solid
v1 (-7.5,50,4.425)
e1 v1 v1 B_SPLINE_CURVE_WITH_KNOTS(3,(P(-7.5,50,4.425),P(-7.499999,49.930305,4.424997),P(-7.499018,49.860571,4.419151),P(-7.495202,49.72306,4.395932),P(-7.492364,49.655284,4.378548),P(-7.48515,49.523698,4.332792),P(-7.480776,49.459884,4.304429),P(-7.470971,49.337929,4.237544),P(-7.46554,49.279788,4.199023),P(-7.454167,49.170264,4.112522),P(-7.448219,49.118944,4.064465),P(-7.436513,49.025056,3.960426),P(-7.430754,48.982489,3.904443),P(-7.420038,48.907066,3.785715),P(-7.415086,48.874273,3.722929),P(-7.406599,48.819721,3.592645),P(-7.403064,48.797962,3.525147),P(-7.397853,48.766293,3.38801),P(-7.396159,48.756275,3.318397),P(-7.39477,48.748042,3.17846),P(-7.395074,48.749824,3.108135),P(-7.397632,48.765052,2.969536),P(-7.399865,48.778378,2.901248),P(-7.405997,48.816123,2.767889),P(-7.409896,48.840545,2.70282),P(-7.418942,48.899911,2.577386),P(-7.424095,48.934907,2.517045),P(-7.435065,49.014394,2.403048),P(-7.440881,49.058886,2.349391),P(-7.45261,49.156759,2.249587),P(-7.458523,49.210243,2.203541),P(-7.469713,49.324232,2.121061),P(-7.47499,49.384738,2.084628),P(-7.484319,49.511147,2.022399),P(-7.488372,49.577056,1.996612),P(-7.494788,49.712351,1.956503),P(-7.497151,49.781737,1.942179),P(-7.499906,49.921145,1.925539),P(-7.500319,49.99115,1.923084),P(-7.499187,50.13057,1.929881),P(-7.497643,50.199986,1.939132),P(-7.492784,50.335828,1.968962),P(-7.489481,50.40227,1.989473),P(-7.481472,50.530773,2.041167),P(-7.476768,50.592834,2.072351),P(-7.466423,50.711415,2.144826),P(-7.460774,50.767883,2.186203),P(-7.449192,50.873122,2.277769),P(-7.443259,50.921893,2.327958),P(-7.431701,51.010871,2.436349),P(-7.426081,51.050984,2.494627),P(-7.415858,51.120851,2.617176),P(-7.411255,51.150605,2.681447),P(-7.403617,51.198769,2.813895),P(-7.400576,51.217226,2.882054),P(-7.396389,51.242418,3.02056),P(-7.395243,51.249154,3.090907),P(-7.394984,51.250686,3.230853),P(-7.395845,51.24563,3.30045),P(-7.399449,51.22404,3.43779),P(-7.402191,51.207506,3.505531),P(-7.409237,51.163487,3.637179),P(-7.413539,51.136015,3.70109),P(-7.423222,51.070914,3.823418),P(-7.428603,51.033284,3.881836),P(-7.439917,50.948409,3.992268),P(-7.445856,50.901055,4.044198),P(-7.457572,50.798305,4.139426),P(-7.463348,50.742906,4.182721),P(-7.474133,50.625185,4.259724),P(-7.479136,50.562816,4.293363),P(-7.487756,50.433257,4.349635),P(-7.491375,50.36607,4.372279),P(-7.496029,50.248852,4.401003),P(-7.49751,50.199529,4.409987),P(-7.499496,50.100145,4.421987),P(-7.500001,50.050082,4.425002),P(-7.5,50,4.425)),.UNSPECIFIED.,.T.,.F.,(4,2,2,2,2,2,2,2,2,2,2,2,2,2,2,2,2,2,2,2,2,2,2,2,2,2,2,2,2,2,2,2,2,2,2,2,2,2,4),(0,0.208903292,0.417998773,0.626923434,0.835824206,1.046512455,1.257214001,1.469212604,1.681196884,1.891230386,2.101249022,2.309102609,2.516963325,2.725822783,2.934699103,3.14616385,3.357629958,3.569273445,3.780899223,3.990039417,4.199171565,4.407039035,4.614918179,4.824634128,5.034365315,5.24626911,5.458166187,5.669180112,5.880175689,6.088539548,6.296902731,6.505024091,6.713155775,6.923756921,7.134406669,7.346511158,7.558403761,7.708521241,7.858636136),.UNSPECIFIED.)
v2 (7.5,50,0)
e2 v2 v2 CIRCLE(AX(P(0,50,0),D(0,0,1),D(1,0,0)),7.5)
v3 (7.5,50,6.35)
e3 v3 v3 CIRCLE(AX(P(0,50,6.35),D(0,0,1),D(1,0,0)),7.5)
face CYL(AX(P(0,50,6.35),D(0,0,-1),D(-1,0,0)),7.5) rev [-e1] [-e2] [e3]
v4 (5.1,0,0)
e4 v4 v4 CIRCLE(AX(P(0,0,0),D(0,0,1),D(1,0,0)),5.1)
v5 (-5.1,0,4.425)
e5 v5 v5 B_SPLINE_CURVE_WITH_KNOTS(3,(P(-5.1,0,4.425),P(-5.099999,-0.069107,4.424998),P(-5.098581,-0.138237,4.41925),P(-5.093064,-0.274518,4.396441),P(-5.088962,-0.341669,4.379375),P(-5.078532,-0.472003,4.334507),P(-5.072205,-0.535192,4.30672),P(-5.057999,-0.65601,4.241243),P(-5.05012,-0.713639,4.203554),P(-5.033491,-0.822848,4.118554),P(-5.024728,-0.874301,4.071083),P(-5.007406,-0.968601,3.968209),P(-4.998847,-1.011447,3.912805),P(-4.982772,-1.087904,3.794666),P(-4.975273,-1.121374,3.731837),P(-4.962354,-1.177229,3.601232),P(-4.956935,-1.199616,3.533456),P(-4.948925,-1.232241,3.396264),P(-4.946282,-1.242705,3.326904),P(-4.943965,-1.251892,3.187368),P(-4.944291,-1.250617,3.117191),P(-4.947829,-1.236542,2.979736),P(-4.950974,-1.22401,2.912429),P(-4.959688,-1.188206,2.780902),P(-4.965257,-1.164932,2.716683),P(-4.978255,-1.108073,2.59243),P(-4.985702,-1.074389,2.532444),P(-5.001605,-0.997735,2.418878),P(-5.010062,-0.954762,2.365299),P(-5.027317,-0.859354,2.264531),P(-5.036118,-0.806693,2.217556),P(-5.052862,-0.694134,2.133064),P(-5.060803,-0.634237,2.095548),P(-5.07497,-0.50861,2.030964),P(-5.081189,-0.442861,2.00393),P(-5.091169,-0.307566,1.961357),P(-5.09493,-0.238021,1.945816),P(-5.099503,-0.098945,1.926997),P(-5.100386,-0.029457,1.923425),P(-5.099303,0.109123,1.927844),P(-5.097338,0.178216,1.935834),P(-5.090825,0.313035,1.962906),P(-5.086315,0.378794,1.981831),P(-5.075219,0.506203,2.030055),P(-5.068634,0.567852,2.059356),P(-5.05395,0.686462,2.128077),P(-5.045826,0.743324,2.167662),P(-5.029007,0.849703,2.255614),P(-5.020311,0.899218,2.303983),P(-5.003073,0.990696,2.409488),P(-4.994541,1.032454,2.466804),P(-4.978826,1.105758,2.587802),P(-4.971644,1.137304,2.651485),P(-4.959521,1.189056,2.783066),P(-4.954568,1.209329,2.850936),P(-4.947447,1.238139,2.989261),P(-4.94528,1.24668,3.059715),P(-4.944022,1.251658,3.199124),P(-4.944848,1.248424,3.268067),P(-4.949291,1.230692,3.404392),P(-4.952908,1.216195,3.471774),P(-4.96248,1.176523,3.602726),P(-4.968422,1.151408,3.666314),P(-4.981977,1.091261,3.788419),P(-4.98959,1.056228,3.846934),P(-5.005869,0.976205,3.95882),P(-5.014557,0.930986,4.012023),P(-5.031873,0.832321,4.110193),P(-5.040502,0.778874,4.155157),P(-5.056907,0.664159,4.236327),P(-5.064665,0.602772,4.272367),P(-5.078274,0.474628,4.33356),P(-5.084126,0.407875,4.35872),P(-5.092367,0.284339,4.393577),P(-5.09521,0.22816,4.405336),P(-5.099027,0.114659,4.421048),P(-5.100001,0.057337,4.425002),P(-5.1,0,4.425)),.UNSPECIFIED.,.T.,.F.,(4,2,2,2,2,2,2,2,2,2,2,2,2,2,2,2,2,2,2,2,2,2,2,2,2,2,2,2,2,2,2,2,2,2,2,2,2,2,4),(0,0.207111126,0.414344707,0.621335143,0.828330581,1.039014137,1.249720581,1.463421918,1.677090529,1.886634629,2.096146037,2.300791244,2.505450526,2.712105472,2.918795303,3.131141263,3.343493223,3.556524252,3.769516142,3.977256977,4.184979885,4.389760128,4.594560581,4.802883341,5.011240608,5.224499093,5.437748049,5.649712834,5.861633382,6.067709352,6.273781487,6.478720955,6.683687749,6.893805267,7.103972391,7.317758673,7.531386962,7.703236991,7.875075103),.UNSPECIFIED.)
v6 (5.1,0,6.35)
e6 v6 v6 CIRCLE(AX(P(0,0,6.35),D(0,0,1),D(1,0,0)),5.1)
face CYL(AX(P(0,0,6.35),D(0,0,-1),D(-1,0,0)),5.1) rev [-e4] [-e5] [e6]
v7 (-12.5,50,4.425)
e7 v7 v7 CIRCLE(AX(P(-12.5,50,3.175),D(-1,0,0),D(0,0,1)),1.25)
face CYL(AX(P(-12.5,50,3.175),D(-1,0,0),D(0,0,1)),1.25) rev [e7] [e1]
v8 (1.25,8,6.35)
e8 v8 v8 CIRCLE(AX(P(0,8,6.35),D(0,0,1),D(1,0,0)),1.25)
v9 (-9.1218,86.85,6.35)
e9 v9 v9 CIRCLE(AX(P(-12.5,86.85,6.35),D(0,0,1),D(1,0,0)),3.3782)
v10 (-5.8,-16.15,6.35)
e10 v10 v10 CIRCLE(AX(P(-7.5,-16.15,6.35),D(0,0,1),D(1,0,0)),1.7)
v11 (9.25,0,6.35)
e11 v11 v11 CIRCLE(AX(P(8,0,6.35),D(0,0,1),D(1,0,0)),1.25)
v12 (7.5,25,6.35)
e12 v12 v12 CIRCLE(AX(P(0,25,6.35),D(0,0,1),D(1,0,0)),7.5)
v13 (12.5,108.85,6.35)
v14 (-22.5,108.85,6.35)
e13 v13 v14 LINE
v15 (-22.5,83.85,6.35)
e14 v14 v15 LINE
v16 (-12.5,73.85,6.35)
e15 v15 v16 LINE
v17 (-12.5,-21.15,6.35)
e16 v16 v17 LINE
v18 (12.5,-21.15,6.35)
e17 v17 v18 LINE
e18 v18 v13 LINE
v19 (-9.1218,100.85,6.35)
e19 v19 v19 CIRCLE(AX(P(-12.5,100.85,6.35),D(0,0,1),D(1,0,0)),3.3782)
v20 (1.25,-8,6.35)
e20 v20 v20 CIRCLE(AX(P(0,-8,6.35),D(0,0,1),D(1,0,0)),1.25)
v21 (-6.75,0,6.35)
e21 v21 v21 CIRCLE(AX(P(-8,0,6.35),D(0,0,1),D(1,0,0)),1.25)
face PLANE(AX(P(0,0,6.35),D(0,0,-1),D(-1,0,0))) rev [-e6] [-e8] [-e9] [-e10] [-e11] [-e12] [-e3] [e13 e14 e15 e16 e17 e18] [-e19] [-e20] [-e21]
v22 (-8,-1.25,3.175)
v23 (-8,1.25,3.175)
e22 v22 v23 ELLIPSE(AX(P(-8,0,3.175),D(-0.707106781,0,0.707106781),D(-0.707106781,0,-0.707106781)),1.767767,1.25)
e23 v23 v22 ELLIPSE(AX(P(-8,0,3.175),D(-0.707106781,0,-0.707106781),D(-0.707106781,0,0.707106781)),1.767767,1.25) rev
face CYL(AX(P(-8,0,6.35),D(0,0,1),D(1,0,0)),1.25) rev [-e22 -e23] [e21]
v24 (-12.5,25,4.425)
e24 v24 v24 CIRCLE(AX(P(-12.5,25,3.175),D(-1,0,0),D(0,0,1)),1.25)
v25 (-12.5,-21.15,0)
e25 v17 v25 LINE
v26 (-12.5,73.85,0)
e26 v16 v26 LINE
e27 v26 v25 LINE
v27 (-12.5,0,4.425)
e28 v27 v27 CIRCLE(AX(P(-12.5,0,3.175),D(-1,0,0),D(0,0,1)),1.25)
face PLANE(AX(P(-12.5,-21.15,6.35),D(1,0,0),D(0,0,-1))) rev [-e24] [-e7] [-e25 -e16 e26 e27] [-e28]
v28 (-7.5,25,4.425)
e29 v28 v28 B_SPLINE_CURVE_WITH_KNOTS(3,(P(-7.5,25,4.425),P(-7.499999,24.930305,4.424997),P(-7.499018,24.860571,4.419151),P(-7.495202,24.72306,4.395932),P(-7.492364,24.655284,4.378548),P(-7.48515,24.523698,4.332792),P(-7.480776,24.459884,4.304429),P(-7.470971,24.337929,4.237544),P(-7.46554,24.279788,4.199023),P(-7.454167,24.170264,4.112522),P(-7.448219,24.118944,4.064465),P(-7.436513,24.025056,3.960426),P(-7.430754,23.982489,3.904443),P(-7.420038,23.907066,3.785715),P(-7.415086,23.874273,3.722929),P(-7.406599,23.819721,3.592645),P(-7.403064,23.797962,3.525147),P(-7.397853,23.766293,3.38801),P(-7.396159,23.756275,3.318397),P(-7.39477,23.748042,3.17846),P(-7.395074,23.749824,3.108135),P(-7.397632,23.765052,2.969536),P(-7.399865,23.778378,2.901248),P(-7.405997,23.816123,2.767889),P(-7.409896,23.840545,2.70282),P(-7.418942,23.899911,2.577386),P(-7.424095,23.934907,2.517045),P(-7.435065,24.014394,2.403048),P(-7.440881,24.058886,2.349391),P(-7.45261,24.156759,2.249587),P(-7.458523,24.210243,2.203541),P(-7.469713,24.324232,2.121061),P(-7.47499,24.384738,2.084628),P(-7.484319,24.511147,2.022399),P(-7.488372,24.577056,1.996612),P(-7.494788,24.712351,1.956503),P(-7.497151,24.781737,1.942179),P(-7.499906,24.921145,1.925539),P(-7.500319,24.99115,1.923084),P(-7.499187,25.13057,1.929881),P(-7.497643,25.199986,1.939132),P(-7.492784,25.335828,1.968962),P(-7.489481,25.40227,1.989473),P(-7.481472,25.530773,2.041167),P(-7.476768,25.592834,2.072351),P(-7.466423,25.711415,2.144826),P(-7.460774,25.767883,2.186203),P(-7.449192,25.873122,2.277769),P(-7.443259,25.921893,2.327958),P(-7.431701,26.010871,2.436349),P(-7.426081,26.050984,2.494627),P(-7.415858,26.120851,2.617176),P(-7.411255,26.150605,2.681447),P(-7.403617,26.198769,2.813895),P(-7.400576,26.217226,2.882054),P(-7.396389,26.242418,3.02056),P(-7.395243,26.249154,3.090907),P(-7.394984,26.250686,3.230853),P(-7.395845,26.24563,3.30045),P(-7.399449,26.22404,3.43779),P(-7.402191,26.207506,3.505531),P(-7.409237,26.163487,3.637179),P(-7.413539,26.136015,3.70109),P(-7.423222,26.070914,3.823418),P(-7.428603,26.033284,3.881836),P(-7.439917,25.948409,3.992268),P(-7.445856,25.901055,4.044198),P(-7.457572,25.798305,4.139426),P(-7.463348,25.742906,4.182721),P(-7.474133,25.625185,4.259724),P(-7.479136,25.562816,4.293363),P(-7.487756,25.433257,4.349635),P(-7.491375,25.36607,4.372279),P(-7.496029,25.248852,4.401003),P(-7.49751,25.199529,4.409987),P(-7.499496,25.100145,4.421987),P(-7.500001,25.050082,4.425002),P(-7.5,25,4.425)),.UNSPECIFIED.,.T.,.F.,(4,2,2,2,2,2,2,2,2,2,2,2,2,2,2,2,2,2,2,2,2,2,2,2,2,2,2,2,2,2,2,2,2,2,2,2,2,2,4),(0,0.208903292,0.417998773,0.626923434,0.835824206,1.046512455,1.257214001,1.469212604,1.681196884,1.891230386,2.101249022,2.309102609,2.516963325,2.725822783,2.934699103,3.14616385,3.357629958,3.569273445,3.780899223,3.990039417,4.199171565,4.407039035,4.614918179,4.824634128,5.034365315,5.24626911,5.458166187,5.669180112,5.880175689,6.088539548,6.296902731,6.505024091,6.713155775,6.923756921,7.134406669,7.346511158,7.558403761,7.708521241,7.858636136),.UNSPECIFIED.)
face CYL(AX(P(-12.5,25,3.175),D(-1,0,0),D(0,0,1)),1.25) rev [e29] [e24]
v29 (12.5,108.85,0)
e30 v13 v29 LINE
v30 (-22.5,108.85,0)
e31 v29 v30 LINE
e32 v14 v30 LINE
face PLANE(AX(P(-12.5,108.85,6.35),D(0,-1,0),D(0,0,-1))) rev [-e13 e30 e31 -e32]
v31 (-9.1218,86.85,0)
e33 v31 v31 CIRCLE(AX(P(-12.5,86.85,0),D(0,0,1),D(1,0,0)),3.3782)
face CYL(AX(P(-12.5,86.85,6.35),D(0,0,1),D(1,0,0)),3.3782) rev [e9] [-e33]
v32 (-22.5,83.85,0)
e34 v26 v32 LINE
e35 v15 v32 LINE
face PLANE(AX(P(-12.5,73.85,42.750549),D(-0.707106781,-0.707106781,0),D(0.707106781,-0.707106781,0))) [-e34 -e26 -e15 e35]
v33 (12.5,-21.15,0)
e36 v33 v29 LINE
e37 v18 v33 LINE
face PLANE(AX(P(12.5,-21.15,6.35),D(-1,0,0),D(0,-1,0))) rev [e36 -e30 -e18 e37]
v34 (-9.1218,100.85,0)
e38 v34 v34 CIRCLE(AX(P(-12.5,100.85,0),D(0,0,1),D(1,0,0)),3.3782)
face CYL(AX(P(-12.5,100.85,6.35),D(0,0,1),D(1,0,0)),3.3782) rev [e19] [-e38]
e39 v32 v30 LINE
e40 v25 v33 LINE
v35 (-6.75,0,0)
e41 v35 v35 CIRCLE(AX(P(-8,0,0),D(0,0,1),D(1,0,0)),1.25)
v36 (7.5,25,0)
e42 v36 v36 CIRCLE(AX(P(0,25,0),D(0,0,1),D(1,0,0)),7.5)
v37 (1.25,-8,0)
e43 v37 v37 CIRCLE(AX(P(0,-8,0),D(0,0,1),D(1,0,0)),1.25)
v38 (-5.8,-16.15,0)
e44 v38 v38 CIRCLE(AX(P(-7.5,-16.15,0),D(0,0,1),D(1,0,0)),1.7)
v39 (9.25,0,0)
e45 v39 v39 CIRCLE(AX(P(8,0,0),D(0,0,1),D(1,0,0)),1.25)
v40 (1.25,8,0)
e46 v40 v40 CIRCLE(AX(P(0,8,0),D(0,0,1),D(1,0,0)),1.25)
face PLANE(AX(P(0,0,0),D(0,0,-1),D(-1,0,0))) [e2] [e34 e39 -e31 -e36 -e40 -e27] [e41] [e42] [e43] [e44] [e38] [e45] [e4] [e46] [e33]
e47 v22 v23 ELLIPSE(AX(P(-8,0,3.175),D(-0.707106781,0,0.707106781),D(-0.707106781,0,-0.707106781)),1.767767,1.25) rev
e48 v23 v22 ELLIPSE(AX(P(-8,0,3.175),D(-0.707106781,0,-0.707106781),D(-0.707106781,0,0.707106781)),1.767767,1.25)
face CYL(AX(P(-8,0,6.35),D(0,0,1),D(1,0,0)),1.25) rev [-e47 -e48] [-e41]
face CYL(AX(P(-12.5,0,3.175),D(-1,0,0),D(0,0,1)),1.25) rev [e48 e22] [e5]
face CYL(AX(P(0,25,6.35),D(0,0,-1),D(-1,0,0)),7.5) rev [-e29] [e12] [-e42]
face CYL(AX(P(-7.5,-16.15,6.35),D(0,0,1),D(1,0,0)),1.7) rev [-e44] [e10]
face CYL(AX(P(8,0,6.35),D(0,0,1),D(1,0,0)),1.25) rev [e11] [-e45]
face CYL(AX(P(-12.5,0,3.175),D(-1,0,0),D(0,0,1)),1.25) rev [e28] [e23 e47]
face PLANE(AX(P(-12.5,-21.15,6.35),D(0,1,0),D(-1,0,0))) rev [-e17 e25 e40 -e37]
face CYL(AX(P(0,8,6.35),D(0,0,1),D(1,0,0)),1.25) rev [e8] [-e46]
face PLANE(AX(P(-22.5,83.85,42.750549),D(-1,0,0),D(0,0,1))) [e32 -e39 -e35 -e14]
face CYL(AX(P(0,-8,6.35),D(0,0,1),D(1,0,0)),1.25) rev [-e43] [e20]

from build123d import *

# Parameters (mm, degrees)
SKETCH2_W                       = 25
SKETCH2_H                       = 130
SKETCH2_R                       = 5.1
SKETCH2_R_2                     = 7.5
BOSS_EXTRUDE1_DEPTH             = 6.35
TAP_DRILL_FOR_M3X0_5_TAP1_D     = 2.5
TAP_DRILL_FOR_M3X0_5_TAP1_DEPTH = 12.5
TAP_DRILL_FOR_M3X0_5_TAP1_TIP   = 0.751075774
BOSS_EXTRUDE2_DEPTH             = 6.35
F_1_4_CLEARANCE_HOLE1_D         = 6.7564
TAP_DRILL_FOR_M3X0_5_TAP2_D     = 2.5
M3_CLEARANCE_HOLE1_OUTLINE_R    = 1.7
M3_CLEARANCE_HOLE1_DEPTH        = 6.35


# Read off the part's stored shape, not the designer's step: M3 Clearance Hole1
with BuildPart() as part:
    # Sketch2 → Boss-Extrude1 (new body)
    with BuildSketch(Plane.XY):
        with Locations((0, 43.85)):
            Rectangle(SKETCH2_W, SKETCH2_H)
        Circle(SKETCH2_R, mode=Mode.SUBTRACT)
        with Locations((0, 25)):
            Circle(SKETCH2_R_2, mode=Mode.SUBTRACT)
        with Locations((0, 50)):
            Circle(SKETCH2_R_2, mode=Mode.SUBTRACT)
    extrude(amount=BOSS_EXTRUDE1_DEPTH)

    # Tap Drill for M3x0.5 Tap1
    with Locations(Plane.ZY.offset(12.5)):
        with Locations((3.175, 50), (3.175, 0), (3.175, 25)):
            Hole(TAP_DRILL_FOR_M3X0_5_TAP1_D / 2, depth=TAP_DRILL_FOR_M3X0_5_TAP1_DEPTH)
            with Locations((0, 0, -(TAP_DRILL_FOR_M3X0_5_TAP1_DEPTH + TAP_DRILL_FOR_M3X0_5_TAP1_TIP / 2))):  # 118° drill point
                Cone(0, TAP_DRILL_FOR_M3X0_5_TAP1_D / 2, TAP_DRILL_FOR_M3X0_5_TAP1_TIP, mode=Mode.SUBTRACT)

    # Sketch8 → Boss-Extrude2 (add)
    with BuildSketch(Plane(origin=(0, 0, 0), x_dir=(-1, 0, 0), z_dir=(0, 0, -1))):
        Polygon((12.5, 73.85), (22.5, 83.85), (22.5, 108.85), (12.5, 108.85), align=None)
    extrude(amount=-BOSS_EXTRUDE2_DEPTH)

    # 1/4 Clearance Hole1 (through all)
    with Locations(Plane.XY.offset(6.35)):
        with Locations((-12.5, 86.85), (-12.5, 100.85)):
            Hole(F_1_4_CLEARANCE_HOLE1_D / 2)

    # Tap Drill for M3x0.5 Tap2 (through all)
    with Locations(Plane.XY.offset(6.35)):
        with Locations((-8, 0), (0, 8), (8, 0), (0, -8)):
            Hole(TAP_DRILL_FOR_M3X0_5_TAP2_D / 2)

    # M3 Clearance Hole1 outline → M3 Clearance Hole1 (cut)
    with BuildSketch(Plane.XY):
        with Locations((-7.5, -16.15)):
            Circle(M3_CLEARANCE_HOLE1_OUTLINE_R)
    extrude(amount=M3_CLEARANCE_HOLE1_DEPTH, mode=Mode.SUBTRACT)


solid = part.part
